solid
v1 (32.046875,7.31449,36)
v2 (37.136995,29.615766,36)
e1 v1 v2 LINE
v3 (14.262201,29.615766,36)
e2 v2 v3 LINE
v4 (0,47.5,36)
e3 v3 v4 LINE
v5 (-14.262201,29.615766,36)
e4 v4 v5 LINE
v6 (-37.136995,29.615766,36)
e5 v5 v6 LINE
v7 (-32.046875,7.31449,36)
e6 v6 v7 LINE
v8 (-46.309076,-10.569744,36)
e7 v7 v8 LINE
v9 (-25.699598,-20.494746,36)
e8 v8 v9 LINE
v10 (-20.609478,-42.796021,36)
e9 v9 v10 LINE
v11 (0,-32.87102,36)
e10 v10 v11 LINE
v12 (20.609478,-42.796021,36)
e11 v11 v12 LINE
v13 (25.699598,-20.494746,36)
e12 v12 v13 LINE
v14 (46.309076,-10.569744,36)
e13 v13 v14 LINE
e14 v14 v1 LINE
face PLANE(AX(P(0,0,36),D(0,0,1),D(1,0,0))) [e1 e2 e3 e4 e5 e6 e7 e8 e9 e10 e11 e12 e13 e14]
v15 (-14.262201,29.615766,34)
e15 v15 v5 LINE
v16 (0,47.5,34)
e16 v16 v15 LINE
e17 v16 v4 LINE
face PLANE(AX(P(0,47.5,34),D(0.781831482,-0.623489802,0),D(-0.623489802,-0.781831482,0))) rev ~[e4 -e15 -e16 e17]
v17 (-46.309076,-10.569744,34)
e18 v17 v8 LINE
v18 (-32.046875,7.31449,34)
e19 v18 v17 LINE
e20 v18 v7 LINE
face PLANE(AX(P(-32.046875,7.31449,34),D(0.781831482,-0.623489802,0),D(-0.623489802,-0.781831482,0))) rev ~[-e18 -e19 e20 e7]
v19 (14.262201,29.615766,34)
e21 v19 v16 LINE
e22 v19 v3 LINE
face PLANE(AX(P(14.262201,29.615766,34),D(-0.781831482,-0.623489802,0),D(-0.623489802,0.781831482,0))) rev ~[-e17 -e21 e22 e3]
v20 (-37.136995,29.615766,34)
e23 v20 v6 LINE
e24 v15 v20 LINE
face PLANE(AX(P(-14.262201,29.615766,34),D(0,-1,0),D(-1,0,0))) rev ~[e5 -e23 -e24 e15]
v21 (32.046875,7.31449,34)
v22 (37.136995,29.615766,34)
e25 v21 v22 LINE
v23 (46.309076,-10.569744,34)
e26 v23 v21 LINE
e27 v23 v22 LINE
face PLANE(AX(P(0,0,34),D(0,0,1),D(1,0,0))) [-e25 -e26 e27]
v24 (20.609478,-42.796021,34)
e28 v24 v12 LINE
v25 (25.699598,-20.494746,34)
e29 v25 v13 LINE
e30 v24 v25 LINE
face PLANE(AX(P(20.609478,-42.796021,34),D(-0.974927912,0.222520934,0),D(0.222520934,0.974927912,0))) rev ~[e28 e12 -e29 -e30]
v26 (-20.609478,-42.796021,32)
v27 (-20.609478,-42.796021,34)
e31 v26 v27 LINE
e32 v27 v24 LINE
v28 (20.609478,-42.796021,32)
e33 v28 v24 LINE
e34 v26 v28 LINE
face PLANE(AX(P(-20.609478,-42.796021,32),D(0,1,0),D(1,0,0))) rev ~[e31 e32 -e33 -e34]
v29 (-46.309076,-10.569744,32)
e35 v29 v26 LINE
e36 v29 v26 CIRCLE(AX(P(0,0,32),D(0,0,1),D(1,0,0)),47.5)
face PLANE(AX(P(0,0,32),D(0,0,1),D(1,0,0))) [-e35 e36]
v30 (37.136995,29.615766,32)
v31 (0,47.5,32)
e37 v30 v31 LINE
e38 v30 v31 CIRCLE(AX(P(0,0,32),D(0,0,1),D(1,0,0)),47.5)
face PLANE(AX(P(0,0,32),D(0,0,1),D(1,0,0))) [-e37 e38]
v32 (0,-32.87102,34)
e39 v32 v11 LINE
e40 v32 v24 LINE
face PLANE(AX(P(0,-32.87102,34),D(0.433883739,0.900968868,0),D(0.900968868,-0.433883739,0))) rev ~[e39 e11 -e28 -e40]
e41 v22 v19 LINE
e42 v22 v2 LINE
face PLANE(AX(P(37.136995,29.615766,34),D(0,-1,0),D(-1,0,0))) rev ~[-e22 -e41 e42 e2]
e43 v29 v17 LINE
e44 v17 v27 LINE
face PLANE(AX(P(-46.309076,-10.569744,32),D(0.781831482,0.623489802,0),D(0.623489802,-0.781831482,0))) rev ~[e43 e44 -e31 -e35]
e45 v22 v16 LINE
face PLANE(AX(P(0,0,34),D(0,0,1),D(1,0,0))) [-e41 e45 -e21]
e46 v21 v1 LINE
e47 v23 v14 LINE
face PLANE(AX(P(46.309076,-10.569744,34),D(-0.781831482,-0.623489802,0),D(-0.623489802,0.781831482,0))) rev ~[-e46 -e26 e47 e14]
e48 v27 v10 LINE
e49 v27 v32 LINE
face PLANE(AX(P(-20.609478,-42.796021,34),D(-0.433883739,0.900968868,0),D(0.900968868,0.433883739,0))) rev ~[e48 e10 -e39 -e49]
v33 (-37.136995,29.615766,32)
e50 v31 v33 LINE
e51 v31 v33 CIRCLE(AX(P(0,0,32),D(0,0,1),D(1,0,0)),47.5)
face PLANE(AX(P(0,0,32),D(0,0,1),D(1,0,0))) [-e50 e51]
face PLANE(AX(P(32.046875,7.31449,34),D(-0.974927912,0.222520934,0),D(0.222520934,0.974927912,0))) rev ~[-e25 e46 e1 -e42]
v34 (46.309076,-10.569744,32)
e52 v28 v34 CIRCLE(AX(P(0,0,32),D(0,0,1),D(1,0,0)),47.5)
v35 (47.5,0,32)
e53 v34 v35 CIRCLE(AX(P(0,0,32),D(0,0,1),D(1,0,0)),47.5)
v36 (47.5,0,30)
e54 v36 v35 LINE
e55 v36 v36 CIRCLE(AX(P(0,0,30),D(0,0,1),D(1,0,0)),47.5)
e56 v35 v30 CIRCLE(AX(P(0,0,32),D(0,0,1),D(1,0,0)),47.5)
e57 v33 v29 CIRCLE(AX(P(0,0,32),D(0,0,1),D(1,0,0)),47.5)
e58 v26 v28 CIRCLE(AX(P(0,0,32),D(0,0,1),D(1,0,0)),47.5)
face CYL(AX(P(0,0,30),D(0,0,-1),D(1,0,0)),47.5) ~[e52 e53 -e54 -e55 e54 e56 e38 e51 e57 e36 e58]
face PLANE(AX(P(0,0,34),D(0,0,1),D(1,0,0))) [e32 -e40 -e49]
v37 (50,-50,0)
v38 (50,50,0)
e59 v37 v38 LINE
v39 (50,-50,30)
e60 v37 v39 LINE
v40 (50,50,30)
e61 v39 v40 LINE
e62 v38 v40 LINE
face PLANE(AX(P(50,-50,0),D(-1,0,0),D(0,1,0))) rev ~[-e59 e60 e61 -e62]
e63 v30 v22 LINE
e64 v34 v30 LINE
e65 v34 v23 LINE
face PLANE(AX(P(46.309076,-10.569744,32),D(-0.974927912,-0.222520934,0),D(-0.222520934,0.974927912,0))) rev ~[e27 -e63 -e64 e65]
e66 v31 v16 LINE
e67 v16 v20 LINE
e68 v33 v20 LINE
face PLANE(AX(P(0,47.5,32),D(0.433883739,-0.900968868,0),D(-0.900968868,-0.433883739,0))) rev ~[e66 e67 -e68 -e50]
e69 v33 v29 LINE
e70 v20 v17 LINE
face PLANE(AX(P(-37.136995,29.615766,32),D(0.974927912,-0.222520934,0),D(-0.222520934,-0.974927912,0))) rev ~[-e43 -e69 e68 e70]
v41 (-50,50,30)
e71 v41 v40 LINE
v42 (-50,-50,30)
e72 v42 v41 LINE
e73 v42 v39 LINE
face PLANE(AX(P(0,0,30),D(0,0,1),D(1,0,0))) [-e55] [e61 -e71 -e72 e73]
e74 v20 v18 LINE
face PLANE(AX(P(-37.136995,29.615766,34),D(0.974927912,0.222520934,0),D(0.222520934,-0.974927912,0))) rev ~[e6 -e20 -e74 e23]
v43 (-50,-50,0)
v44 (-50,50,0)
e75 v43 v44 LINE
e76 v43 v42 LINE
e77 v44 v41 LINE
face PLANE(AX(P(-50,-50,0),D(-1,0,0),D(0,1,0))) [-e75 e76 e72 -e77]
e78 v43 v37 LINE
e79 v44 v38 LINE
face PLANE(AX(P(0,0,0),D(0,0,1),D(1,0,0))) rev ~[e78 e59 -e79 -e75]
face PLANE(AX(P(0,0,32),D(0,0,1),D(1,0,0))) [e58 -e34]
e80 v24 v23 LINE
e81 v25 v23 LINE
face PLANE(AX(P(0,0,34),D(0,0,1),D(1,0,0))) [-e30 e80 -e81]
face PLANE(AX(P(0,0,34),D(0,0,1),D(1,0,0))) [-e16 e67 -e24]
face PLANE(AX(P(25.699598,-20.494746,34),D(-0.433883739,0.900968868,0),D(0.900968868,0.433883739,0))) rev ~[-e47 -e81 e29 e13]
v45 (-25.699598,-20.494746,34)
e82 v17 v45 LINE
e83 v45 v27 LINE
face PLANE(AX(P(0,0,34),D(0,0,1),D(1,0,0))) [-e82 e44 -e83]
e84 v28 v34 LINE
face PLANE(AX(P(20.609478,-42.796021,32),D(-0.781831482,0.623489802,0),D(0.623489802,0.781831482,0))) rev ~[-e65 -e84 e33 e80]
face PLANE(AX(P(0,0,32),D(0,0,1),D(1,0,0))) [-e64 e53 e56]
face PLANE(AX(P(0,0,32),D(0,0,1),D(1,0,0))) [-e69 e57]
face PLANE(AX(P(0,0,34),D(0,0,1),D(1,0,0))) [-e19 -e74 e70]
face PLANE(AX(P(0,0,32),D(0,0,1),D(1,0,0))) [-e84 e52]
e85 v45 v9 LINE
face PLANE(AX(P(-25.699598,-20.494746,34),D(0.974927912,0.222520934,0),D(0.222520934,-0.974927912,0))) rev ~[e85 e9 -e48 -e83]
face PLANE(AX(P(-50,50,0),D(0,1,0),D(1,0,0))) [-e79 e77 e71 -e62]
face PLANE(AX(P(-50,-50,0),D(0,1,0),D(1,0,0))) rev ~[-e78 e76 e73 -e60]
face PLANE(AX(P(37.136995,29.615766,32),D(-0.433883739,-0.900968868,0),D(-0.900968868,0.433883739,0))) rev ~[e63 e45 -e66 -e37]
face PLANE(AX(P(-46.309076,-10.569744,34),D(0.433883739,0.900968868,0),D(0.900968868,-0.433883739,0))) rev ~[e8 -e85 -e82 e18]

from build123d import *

# Parameters (mm, degrees)
F0_W     = 100
F0_H     = 100
F1_DEPTH = 30
F2_R     = 47.5
F3_DEPTH = 2
F5_DEPTH = 2
F7_DEPTH = 2


# Not quite as in the source:
# - a feature names something its author has since deleted; it is built from what else it names


with BuildPart() as f1:
    # F0 (on Top) → F1 (new body)
    with BuildSketch(Plane.XY):
        Rectangle(F0_W, F0_H)
    extrude(amount=F1_DEPTH)

    # F2 (on face) → F3 (join)
    with BuildSketch(Plane.XY.offset(30)):
        Circle(F2_R)
    extrude(amount=F3_DEPTH)

    # F4 (on face) → F5 (join)
    with BuildSketch(Plane.XY.offset(32)):
        Polygon((37.1369954172, 29.6157655883), (0, 47.5), (-37.1369954172, 29.6157655883), (-46.3090758286, -10.5697443629), (-20.6094776081, -42.7960212254), (20.6094776081, -42.7960212254), (46.3090758286, -10.5697443629), align=None)
    extrude(amount=F5_DEPTH)

    # F6 (on face) → F7 (join)
    with BuildSketch(Plane.XY.offset(34)):
        Polygon((-25.6995982206, -20.4947456859), (-20.6094776081, -42.7960212254), (0, -32.8710199024), (20.6094776081, -42.7960212254), (25.6995982206, -20.4947456859), (46.3090758286, -10.5697443629), (32.0468748048, 7.3144900488), (37.1369954172, 29.6157655883), (14.2622010239, 29.6157655883), (0, 47.5), (-14.2622010239, 29.6157655883), (-37.1369954172, 29.6157655883), (-32.0468748048, 7.3144900488), (-46.3090758286, -10.5697443629), align=None)
    extrude(amount=F7_DEPTH)


solid = f1.part
